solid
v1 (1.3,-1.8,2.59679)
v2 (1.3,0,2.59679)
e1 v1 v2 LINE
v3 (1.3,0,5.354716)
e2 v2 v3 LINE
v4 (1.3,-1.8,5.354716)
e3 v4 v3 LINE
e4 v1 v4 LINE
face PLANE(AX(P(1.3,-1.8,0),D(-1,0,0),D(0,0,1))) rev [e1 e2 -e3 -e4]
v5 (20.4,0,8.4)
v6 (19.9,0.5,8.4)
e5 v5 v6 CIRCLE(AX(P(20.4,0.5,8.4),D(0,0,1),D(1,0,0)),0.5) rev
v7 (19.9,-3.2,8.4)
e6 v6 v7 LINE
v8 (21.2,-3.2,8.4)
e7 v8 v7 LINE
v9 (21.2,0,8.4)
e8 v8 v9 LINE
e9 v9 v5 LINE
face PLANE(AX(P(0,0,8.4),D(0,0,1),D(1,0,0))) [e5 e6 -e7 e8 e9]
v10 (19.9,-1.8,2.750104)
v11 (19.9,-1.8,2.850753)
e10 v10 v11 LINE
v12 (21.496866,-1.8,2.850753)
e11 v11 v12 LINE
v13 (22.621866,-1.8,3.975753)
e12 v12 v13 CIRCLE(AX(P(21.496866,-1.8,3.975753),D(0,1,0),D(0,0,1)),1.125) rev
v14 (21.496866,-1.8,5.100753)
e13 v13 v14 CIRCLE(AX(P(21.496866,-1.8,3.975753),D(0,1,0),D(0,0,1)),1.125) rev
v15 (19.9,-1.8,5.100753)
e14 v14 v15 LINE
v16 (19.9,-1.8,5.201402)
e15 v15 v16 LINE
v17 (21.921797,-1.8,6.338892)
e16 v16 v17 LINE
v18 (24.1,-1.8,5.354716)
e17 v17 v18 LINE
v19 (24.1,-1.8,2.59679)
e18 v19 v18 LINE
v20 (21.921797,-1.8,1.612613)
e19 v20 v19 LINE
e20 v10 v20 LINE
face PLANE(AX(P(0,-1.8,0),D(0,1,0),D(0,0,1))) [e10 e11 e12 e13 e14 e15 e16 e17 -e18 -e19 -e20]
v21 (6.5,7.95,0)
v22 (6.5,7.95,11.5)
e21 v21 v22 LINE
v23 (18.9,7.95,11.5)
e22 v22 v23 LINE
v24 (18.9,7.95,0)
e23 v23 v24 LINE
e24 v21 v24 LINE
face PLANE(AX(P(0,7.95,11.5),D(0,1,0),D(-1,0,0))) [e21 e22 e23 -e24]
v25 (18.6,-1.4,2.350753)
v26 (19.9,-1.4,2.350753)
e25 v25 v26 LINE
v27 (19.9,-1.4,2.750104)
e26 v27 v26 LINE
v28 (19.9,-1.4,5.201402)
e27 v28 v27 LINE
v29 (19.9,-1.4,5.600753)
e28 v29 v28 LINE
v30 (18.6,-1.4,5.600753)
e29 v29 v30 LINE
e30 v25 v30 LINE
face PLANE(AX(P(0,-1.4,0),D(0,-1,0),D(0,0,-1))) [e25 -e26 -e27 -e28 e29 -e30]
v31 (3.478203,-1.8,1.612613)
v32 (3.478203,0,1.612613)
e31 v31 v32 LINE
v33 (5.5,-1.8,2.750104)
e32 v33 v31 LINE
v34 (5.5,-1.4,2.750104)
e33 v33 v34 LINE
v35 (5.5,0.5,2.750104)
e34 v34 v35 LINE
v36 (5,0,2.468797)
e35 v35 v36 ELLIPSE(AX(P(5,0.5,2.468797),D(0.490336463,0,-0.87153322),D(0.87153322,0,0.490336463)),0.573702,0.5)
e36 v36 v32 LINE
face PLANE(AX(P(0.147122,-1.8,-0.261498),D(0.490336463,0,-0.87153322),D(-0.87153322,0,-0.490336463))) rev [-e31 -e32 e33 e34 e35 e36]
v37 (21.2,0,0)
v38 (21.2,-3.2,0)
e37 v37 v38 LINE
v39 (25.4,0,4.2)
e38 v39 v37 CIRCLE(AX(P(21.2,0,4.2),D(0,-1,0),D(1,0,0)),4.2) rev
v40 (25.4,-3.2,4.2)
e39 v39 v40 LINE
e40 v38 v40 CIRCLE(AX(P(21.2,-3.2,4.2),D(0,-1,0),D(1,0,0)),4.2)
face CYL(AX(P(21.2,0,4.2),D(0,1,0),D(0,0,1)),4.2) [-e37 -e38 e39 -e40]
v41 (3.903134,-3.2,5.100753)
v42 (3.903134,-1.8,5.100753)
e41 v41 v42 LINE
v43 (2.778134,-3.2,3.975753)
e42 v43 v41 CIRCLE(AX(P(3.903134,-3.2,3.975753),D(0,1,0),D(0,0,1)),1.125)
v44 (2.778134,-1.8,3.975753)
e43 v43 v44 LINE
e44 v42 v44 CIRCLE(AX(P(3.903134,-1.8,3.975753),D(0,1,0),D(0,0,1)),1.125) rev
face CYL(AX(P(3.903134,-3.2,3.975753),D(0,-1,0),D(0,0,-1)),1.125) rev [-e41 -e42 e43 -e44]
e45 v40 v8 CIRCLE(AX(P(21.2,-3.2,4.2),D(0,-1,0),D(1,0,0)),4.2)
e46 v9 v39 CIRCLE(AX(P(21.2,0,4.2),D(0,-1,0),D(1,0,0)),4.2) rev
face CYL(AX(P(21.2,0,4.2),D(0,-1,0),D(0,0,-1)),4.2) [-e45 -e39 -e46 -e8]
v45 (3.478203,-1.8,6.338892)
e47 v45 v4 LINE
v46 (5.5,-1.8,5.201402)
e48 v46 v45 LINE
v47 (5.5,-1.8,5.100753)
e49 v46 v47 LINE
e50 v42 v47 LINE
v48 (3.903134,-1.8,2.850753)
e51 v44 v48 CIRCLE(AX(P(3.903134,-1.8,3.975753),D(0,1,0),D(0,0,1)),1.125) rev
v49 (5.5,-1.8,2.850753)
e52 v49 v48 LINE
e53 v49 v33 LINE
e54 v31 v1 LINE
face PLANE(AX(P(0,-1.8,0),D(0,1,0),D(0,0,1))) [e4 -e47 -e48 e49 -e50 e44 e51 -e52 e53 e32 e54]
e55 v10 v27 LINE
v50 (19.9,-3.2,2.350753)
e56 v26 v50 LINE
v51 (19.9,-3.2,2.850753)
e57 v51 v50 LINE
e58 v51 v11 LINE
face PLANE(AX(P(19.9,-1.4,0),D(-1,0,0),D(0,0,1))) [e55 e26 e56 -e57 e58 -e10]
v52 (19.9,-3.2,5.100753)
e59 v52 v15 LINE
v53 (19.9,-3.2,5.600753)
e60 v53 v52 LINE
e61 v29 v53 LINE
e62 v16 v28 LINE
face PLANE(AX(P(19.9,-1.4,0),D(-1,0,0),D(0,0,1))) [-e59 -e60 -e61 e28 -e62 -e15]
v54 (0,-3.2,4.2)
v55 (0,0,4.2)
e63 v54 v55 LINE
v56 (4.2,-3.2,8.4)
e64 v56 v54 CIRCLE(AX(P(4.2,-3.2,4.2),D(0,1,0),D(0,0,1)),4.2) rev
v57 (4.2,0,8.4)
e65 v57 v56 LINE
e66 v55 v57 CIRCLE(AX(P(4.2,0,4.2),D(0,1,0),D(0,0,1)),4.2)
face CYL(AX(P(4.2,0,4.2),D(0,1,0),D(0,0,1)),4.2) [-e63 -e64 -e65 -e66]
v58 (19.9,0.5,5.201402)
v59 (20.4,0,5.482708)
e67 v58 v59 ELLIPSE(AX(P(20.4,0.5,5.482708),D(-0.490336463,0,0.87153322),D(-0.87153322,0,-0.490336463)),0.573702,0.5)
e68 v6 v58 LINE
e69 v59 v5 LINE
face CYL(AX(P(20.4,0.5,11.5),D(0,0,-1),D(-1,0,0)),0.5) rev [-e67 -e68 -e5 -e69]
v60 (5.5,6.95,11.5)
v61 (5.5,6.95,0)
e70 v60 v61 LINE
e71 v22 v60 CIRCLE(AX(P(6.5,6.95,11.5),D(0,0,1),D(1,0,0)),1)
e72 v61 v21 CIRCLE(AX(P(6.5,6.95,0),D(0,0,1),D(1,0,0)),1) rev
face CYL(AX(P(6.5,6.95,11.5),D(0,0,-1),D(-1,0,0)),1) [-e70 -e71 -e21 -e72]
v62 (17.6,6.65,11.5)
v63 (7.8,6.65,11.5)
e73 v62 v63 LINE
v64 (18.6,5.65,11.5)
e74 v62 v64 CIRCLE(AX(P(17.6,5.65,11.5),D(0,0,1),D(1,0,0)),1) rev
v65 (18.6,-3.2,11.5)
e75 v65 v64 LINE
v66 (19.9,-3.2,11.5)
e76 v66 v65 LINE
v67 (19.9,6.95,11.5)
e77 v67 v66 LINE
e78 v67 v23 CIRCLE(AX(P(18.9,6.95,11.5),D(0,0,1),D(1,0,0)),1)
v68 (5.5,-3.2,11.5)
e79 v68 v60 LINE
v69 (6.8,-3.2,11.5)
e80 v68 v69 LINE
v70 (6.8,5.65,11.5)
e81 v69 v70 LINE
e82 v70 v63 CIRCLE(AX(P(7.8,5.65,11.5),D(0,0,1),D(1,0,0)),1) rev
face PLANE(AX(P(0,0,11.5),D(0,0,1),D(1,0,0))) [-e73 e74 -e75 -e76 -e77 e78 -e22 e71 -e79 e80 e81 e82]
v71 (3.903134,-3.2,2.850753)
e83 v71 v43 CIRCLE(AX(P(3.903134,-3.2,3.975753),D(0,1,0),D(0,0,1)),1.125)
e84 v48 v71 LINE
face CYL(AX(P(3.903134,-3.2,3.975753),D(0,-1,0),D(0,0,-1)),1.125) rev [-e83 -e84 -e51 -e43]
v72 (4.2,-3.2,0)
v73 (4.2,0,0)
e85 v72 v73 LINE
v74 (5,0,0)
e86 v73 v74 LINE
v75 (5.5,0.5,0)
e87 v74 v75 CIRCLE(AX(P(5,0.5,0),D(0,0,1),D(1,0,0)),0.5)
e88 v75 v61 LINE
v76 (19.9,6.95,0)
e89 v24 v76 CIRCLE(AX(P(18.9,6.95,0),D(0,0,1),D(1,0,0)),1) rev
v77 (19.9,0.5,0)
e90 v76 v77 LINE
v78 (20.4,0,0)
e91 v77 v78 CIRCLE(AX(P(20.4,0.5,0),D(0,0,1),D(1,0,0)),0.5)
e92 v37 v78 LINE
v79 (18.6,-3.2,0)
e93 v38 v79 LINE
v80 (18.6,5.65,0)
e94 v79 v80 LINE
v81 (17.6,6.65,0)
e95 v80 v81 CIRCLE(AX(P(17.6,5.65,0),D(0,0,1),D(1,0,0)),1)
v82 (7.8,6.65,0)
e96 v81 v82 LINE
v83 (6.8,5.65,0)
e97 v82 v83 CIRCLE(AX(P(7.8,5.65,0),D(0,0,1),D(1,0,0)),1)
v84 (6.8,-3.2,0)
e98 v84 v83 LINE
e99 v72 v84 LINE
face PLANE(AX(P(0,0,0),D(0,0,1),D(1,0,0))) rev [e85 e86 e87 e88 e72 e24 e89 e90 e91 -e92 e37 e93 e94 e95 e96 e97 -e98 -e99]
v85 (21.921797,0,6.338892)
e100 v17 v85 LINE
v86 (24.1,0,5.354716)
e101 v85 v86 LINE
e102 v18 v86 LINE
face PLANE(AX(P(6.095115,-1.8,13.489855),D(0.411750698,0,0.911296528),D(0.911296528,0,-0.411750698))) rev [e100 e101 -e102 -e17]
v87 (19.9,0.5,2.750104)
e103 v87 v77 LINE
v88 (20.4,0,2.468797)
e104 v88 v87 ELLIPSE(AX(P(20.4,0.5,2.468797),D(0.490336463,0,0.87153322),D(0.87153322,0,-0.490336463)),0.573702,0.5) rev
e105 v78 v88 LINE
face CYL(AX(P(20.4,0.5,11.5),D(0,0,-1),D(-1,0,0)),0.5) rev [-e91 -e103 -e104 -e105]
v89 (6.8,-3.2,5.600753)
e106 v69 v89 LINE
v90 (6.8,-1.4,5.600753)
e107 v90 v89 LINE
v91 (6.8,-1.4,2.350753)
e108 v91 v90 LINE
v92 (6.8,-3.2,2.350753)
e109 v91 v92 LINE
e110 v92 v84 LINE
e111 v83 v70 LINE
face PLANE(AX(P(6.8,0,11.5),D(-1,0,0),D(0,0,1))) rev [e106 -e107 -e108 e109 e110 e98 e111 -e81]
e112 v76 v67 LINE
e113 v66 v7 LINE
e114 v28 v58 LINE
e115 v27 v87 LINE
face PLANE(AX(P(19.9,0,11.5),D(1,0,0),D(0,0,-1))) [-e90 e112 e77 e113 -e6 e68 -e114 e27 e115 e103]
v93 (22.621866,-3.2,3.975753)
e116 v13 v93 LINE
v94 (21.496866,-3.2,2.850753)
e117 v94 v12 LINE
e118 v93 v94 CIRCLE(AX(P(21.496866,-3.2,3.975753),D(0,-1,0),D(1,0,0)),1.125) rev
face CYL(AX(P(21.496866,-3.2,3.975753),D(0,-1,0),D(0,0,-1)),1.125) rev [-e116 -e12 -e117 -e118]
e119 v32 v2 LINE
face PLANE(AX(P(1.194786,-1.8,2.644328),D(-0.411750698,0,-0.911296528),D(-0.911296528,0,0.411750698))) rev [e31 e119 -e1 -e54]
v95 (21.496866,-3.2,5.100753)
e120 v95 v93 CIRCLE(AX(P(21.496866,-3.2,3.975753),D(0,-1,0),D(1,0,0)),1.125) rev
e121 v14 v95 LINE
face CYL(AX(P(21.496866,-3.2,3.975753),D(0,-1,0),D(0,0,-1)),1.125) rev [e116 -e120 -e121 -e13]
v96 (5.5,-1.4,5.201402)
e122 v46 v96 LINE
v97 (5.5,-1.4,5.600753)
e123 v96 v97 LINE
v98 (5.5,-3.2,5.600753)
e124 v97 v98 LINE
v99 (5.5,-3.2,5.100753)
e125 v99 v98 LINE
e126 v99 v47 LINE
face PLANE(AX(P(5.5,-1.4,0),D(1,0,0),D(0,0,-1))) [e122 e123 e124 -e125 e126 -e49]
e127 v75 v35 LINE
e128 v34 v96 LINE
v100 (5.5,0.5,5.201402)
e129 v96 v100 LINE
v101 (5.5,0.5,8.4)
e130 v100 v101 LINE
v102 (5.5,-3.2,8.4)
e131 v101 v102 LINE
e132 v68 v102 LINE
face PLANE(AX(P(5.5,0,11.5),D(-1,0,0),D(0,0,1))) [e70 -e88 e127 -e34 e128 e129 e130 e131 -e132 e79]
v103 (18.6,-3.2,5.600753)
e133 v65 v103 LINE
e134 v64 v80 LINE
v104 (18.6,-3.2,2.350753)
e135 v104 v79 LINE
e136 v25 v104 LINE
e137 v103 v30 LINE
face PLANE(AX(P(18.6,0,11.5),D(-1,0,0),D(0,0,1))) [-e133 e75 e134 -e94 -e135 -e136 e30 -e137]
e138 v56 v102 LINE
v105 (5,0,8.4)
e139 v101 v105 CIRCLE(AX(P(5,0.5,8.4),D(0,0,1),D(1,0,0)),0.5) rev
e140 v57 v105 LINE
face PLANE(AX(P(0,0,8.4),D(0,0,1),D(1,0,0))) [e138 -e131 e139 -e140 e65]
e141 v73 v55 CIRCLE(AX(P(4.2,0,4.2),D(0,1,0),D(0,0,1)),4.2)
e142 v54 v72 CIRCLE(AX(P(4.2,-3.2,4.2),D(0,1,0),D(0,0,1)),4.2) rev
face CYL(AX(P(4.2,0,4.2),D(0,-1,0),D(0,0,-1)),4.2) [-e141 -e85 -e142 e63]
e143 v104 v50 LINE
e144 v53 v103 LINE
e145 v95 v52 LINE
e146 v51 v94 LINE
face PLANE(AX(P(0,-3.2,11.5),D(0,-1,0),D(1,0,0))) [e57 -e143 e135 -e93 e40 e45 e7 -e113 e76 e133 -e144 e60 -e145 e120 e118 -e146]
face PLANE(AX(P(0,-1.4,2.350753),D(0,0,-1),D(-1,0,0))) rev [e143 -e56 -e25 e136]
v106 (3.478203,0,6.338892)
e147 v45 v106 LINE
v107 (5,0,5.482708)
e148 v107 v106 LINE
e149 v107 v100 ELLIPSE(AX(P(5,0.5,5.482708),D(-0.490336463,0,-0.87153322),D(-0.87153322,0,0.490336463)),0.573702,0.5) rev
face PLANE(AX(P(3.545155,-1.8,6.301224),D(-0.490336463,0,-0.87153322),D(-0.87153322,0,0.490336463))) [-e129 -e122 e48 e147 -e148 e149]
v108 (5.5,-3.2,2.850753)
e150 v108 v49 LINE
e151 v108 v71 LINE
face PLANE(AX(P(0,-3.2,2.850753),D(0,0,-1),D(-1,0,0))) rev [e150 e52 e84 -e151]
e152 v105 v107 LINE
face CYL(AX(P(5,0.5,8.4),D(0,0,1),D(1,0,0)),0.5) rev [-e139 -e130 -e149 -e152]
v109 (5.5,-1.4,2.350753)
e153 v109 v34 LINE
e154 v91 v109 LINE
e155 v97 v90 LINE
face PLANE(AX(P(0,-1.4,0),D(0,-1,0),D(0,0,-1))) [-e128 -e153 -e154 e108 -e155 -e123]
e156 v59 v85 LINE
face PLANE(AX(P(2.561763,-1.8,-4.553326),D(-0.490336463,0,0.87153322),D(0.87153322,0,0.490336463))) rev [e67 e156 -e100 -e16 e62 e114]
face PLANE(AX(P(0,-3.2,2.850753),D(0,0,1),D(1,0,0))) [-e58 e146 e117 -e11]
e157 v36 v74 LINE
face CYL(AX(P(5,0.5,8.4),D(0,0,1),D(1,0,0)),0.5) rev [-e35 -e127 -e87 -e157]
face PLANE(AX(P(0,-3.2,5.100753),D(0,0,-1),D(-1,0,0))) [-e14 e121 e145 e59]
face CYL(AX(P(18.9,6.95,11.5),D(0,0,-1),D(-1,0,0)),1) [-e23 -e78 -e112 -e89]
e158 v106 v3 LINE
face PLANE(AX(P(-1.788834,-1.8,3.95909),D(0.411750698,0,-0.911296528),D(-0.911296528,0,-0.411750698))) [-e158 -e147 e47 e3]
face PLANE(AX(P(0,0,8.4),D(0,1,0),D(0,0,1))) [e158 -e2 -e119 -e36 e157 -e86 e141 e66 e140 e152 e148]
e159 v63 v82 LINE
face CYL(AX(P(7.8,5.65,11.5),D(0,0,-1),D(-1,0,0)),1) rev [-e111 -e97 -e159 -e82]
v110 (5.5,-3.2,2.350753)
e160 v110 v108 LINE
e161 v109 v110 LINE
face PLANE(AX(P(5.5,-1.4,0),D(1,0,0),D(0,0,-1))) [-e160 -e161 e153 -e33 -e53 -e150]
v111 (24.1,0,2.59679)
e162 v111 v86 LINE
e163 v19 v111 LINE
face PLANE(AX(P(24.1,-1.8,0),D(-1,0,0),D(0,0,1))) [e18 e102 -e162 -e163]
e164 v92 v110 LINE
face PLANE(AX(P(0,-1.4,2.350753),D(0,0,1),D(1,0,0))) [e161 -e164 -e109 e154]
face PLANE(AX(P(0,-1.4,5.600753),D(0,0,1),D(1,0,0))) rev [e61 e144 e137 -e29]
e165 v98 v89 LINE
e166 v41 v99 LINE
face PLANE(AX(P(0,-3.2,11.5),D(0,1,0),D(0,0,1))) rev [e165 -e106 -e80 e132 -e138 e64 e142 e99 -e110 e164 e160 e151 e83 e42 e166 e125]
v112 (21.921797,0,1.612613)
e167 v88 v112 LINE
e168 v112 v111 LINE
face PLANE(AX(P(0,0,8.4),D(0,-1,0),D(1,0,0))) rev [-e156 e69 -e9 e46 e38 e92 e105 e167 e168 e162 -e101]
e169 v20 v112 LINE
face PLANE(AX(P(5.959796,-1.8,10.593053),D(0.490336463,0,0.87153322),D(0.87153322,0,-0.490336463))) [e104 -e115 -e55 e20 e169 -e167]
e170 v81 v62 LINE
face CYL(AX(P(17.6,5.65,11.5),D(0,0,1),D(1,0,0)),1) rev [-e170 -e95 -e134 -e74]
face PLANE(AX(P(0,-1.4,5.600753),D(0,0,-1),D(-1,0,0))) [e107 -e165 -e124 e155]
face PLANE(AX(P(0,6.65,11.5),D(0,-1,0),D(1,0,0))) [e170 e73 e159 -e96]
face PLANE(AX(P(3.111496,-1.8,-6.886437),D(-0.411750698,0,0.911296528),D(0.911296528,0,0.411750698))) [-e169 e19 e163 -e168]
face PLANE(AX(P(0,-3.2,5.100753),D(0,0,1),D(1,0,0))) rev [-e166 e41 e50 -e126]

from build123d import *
from OCP.BRepFilletAPI import BRepFilletAPI_MakeFillet

# Parameters (mm, degrees)
BOSS_EXTRUDE1_DEPTH = 11.5
SKETCH1_3_W         = 5.5
SKETCH1_3_H         = 3.2
BOSS_EXTRUDE2_DEPTH = 8.4
CUT_EXTRUDE1_DEPTH  = 1.8
SKETCH5_3_W         = 2.721866022
SKETCH5_3_H         = 2.25
CUT_EXTRUDE2_DEPTH  = 29.993318196
FILLET1_R           = 4.2
FILLET1_R_2         = 1.125
FILLET1_R_3         = 1
FILLET1_R_4         = 0.5
CUT_EXTRUDE12_DEPTH = 1.8


with BuildPart() as part:
    # Sketch1 → Boss-Extrude1 (new body)
    with BuildSketch(Plane.XY):
        Polygon((5.5, 7.95), (5.5, 0), (5.5, -3.2), (6.8, -3.2), (6.8, 6.65), (12.7, 6.65), (12.7, 7.95), align=None)
        Polygon((19.9, 7.95), (12.7, 7.95), (12.7, 6.65), (18.6, 6.65), (18.6, -3.2), (19.9, -3.2), (19.9, 0), align=None)
    extrude(amount=BOSS_EXTRUDE1_DEPTH)

    # Sketch1<3> → Boss-Extrude2 (add)
    with BuildSketch(Plane.XY):
        with Locations((2.75, -1.6)):
            Rectangle(SKETCH1_3_W, SKETCH1_3_H)
        with Locations((22.65, -1.6)):
            Rectangle(SKETCH1_3_W, SKETCH1_3_H)
    extrude(amount=BOSS_EXTRUDE2_DEPTH)

    # Sketch5 → Cut-Extrude1 (cut)
    with BuildSketch(Plane(origin=(0, 0, 0), x_dir=(1, 0, 0), z_dir=(0, 1, 0))):
        Polygon((3.478202851, -1.61261316), (1.3, -2.596789569), (1.3, -5.354715804), (3.478202851, -6.338892213), (5.5, -5.201401594), (5.5, -5.100752687), (2.778133978, -5.100752687), (2.778133978, -2.850752687), (5.5, -2.850752687), (5.5, -2.750103779), align=None)
        Polygon((19.9, -5.100752687), (19.9, -5.201401594), (21.921797149, -6.338892213), (24.1, -5.354715804), (24.1, -2.596789569), (21.921797149, -1.61261316), (19.9, -2.750103779), (19.9, -2.850752687), (22.621866022, -2.850752687), (22.621866022, -5.100752687), align=None)
    extrude(amount=-CUT_EXTRUDE1_DEPTH, mode=Mode.SUBTRACT)

    # Sketch5<3> → Cut-Extrude2 (cut, through all)
    with BuildSketch(Plane(origin=(0, 0, 0), x_dir=(1, 0, 0), z_dir=(0, 1, 0))):
        Polygon((2.778133978, -2.850752687), (2.778133978, -3.975752687), (2.778133978, -5.100752687), (5.5, -5.100752687), (5.5, -2.850752687), align=None)
        with Locations((21.260933011, -3.975752687)):
            Rectangle(SKETCH5_3_W, SKETCH5_3_H)
    extrude(amount=-CUT_EXTRUDE2_DEPTH, mode=Mode.SUBTRACT)

    # Fillet1
    fillet1_edges_1 = [part.edges().sort_by_distance(p)[0] for p in [
        (0, -1.6, 0),
        (0, -1.6, 8.4),
        (25.4, -1.6, 8.4),
        (25.4, -1.6, 0),
    ]]
    fillet1_edges_2 = [part.edges().sort_by_distance(p)[0] for p in [
        (2.778133978, -2.5, 5.100752687),
        (2.778133978, -2.5, 2.850752687),
        (22.621866022, -2.5, 2.850752687),
        (22.621866022, -2.5, 5.100752687),
    ]]
    fillet1_edges_3 = [part.edges().sort_by_distance(p)[0] for p in [
        (5.5, 7.95, 5.75),
        (19.9, 7.95, 5.75),
        (18.6, 6.65, 5.75),
        (6.8, 6.65, 5.75),
    ]]
    fillet1_edges_4 = [part.edges().sort_by_distance(p)[0] for p in [
        (5.5, 0, 6.800700797),
        (19.9, 0, 6.800700797),
        (19.9, 0, 1.37505189),
        (5.5, 0, 1.37505189),
    ]]
    fillet1 = BRepFilletAPI_MakeFillet(part.part.solid().wrapped)
    for e in fillet1_edges_1:
        fillet1.Add(FILLET1_R - 0.0001, e.wrapped)
    for e in fillet1_edges_2:
        fillet1.Add(FILLET1_R_2 - 0.0001, e.wrapped)
    for e in fillet1_edges_3:
        fillet1.Add(FILLET1_R_3 - 0.0001, e.wrapped)
    for e in fillet1_edges_4:
        fillet1.Add(FILLET1_R_4 - 0.0001, e.wrapped)
    add(Compound.cast(fillet1.Shape()), mode=Mode.REPLACE)  # a hair under: the kernel refuses the full size

    # Sketch6 → Cut-Extrude12 (cut)
    with BuildSketch(Plane.XZ.offset(3.2)):
        Polygon((19.9, 5.100752687), (19.9, 2.850752687), (19.9, 2.350752687), (18.327658743, 2.350752687), (18.327658743, 5.600752687), (19.9, 5.600752687), align=None)
        Polygon((5.5, 5.600752687), (5.5, 5.100752687), (5.5, 2.850752687), (5.5, 2.350752687), (6.8, 2.350752687), (6.8, 5.600752687), align=None)
    extrude(amount=-CUT_EXTRUDE12_DEPTH, mode=Mode.SUBTRACT)


solid = part.part
